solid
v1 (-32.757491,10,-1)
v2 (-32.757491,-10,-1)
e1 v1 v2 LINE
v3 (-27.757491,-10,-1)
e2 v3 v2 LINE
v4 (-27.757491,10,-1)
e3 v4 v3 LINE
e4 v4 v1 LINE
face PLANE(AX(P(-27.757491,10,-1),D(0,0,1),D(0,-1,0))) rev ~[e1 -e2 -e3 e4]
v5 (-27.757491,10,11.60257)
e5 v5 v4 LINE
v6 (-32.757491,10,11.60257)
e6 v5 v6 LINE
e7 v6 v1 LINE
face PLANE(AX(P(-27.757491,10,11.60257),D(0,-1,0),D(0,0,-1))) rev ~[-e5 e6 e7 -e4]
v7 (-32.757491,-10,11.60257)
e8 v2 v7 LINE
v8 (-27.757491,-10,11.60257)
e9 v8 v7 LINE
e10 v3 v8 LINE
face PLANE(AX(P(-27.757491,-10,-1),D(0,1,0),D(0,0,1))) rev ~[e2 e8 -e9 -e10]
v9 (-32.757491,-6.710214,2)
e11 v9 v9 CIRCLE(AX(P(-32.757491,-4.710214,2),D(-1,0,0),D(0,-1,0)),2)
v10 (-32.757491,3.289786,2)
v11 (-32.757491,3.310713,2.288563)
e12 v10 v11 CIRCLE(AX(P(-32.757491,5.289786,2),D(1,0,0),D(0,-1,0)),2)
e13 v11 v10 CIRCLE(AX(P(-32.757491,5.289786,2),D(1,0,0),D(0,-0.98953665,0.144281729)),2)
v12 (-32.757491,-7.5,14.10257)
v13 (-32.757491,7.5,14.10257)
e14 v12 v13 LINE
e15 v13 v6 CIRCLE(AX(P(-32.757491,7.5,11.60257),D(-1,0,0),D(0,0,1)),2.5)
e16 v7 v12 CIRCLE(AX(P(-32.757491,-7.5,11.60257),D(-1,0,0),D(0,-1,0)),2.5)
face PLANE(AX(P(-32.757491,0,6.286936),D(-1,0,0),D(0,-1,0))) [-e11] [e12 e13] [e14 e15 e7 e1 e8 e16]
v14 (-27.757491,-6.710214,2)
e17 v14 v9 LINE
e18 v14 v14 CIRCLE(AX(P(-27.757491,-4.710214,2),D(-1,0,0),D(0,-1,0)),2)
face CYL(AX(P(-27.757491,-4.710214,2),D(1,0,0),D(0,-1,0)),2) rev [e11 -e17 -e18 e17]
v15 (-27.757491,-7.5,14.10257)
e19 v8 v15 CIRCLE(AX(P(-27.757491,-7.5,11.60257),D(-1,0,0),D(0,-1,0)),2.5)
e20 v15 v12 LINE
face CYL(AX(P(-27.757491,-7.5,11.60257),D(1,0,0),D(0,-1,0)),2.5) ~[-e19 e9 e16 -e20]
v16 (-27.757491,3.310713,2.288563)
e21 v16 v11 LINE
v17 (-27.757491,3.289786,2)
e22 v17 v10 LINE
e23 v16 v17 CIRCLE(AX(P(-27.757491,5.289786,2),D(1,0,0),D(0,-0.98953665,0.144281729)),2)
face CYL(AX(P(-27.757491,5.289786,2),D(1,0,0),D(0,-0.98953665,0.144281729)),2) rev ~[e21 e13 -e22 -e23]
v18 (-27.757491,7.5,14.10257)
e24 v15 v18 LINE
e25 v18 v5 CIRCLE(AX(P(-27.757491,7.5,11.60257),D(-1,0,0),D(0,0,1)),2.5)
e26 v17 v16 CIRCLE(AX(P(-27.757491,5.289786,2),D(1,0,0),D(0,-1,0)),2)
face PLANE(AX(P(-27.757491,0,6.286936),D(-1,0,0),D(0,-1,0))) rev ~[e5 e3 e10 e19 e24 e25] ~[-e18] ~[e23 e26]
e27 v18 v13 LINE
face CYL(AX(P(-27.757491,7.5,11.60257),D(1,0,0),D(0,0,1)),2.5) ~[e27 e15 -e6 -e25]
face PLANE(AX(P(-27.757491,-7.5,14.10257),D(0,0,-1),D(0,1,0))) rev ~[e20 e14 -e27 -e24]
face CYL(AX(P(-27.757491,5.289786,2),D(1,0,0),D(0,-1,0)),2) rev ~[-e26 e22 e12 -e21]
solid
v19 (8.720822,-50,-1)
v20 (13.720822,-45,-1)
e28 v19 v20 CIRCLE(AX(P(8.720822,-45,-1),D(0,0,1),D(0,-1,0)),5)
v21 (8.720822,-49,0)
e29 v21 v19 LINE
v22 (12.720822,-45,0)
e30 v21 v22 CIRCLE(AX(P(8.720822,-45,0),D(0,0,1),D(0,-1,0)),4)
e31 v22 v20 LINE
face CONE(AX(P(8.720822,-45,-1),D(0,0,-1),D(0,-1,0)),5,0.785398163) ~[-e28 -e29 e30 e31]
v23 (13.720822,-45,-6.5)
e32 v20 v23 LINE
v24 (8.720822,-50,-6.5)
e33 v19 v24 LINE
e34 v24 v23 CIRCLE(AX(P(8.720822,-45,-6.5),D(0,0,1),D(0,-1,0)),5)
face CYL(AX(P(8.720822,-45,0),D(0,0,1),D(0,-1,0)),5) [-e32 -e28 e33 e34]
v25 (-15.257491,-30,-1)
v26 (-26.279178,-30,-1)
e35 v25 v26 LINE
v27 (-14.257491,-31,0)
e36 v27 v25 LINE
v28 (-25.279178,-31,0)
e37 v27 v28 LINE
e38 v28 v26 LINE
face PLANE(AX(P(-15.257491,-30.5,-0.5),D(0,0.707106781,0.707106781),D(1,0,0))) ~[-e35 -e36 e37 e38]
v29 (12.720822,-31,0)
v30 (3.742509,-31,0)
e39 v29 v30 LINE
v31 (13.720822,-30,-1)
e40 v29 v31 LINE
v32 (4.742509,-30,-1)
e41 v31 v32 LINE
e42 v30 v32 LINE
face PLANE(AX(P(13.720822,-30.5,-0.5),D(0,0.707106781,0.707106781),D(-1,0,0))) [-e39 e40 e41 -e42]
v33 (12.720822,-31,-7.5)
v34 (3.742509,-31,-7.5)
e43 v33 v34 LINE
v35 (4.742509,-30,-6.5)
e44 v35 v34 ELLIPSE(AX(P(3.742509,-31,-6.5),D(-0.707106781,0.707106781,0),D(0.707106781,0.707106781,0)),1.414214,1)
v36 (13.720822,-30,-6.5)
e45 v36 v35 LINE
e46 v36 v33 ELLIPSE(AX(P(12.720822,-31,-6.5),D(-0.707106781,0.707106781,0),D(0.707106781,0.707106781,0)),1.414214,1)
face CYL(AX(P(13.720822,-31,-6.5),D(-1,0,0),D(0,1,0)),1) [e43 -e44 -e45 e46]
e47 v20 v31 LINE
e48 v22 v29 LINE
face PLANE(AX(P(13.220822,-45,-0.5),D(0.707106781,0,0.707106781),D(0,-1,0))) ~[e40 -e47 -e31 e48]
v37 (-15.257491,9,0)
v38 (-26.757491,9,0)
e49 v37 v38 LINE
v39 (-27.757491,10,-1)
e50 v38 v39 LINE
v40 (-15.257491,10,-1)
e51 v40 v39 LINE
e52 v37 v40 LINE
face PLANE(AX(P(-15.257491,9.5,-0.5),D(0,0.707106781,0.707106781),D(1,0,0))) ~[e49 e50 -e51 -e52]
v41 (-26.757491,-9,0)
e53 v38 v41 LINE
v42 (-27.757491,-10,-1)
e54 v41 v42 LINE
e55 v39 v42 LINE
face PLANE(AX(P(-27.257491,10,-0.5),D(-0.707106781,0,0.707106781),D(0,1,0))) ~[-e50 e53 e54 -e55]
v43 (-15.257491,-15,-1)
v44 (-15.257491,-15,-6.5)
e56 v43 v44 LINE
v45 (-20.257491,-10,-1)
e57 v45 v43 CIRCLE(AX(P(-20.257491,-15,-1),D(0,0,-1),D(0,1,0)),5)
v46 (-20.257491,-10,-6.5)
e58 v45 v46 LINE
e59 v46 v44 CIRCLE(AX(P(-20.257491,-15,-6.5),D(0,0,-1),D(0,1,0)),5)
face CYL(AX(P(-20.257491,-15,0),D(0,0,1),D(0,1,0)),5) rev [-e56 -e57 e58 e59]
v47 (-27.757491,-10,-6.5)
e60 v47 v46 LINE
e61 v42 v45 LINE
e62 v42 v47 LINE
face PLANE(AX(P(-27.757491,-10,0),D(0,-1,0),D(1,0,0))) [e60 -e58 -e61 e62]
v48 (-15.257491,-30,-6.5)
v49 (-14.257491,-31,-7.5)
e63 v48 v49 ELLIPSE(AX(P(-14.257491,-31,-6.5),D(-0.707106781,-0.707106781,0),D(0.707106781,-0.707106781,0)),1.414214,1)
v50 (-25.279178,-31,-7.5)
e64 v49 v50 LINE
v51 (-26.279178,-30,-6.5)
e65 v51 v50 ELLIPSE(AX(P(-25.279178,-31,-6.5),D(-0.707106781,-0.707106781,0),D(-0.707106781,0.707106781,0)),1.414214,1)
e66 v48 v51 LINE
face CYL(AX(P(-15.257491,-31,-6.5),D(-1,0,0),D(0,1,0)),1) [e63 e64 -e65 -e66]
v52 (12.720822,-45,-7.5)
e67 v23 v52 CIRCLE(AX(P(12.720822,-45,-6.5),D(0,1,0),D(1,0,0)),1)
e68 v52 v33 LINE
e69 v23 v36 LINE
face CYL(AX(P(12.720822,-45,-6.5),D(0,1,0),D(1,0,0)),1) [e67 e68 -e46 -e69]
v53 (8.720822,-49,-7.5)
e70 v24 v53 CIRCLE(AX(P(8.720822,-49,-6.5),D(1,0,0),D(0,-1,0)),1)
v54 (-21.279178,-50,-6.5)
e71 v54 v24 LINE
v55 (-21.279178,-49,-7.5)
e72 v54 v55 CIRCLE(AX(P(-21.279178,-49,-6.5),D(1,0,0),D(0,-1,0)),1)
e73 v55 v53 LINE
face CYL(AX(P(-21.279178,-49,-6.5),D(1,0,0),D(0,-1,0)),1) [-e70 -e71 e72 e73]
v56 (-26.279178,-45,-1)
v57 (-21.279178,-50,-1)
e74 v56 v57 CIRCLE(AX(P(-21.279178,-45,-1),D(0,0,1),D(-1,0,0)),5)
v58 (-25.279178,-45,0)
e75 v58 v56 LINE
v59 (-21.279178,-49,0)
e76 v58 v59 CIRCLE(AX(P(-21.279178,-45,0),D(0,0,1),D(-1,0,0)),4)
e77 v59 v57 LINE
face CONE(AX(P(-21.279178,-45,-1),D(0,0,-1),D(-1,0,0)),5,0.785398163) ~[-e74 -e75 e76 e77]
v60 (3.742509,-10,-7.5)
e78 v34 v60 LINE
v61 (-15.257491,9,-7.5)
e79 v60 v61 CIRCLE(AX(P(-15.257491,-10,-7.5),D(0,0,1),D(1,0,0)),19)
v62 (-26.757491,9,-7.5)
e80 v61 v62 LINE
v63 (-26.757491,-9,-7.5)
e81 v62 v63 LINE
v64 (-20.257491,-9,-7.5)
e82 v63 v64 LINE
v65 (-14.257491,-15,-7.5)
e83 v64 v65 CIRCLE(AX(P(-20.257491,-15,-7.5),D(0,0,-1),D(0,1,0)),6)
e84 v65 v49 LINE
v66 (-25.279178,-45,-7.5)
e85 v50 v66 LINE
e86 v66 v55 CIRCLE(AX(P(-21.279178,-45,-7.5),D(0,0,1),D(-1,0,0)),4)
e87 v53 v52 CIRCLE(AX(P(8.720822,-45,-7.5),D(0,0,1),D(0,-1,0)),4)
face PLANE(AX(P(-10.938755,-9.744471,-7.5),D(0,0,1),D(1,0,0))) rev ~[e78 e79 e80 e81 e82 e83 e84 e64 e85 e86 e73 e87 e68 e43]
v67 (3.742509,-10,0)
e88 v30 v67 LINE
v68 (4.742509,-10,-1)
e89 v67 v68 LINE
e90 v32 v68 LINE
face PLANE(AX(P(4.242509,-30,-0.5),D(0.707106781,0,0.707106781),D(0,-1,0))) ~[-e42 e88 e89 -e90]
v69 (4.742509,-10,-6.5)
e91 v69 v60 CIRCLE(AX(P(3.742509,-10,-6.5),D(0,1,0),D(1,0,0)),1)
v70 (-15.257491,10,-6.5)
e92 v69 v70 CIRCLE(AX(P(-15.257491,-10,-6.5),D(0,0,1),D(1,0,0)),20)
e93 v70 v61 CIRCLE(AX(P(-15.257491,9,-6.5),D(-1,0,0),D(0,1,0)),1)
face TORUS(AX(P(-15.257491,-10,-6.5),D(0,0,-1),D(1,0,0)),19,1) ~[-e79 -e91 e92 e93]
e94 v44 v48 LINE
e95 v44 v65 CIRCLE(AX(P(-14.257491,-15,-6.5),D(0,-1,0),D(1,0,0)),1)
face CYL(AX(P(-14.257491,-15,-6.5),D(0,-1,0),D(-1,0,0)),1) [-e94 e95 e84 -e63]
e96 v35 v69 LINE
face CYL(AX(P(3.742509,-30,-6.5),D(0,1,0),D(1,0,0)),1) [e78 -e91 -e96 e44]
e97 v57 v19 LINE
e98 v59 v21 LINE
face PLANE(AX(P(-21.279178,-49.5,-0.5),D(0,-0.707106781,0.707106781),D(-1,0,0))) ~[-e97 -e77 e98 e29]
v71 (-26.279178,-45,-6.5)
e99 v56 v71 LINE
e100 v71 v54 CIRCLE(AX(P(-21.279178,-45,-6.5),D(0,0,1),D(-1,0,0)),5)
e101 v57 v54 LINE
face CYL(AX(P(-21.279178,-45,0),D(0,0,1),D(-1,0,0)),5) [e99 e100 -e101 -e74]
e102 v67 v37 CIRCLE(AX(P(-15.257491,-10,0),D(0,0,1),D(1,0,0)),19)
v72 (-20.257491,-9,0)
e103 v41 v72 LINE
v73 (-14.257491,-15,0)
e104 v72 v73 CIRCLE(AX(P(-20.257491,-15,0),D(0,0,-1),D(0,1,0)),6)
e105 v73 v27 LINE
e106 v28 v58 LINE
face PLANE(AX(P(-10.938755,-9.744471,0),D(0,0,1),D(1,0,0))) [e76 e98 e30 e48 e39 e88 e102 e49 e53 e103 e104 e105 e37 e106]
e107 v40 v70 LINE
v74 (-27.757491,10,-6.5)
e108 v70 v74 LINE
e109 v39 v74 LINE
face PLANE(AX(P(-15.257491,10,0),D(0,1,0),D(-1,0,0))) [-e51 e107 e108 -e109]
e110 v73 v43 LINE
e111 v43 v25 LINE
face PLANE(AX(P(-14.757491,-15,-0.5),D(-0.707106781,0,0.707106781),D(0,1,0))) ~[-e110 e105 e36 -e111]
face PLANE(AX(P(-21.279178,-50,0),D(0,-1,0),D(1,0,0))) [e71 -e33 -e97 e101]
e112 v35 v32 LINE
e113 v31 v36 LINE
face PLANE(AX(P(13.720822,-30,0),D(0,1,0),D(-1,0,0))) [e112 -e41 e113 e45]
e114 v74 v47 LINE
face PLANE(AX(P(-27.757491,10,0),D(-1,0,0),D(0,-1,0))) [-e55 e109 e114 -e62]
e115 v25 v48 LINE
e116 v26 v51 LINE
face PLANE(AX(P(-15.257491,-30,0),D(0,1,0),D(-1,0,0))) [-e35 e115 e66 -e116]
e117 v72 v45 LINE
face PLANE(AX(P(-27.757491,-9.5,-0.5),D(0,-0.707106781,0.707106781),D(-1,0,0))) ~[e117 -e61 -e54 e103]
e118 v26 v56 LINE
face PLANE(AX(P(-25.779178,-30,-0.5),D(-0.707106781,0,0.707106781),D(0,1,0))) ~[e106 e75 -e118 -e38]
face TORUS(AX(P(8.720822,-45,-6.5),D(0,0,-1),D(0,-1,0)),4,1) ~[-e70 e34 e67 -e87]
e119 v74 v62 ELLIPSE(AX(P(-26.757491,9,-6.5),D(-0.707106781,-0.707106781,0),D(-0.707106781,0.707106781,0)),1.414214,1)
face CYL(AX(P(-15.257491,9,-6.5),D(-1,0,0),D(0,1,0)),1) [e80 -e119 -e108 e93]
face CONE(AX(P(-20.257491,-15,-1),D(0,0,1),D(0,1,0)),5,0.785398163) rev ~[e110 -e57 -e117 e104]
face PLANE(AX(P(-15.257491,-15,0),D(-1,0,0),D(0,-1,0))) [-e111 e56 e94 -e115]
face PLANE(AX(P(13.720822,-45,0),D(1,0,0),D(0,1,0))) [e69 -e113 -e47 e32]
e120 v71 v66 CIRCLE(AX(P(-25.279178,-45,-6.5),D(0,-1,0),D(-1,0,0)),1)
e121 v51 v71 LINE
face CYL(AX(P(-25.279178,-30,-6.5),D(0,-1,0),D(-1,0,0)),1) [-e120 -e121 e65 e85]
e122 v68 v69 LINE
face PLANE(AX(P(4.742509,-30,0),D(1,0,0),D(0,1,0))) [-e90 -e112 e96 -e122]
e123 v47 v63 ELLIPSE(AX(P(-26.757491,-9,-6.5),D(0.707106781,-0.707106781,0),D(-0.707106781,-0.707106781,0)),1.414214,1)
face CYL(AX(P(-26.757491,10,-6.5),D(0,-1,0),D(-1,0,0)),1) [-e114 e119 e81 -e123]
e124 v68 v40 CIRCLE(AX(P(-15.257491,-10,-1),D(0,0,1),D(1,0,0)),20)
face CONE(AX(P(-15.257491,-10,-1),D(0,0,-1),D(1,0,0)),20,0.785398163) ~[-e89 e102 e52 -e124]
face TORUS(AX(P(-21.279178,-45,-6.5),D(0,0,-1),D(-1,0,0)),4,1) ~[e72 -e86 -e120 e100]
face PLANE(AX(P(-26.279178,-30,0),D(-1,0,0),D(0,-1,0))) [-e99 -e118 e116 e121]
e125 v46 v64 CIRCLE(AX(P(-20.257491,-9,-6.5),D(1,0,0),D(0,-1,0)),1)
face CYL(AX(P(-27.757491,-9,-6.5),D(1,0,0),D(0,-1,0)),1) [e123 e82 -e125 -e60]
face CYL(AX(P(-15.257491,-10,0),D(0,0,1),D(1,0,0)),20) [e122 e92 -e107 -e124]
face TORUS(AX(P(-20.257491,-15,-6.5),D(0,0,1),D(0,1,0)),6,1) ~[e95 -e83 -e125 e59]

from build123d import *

# Parameters (mm, degrees)
F1_DEPTH = 7.5
F2_DEPTH = 2.5
F3_R     = 1
F4_SIZE  = 1
F5_R     = 2
F6_DEPTH = 5


# Not quite as in the source:
# - a feature names something its author has since deleted; it is built from what else it names


with BuildPart() as f1:
    # F0 (on Top) → F1 (new body)
    with BuildSketch(Plane.XY):
        with BuildLine():
            Line((-15.2574911714, 10), (-27.7574911714, 10))
            Line((-27.7574911714, 10), (-27.7574911714, -10))
            Line((-27.7574911714, -10), (-20.2574911714, -10))
            ThreePointArc((-20.2574911714, -10), (-16.7219572654, -11.4644660941), (-15.2574911714, -15))
            Line((-15.2574911714, -15), (-15.2574911714, -30.0000000031))
            Line((-15.2574911714, -30.0000000031), (4.7425088286, -30.0000000031))
            Line((4.7425088286, -30.0000000031), (4.7425088286, -10))
            ThreePointArc((4.7425088286, -10), (-1.1153555476, 4.1421356237), (-15.2574911714, 10))
        make_face()
        with BuildLine():
            Line((13.7208224833, -30.0000000031), (4.7425088286, -30.0000000031))
            Line((4.7425088286, -30.0000000031), (-15.2574911714, -30.0000000031))
            Line((-15.2574911714, -30.0000000031), (-26.2791775167, -30.0000000031))
            Line((-26.2791775167, -30.0000000031), (-26.2791775167, -45.0000000031))
            ThreePointArc((-26.2791775167, -45.0000000031), (-24.8147114226, -48.535533909), (-21.2791775167, -50.0000000031))
            Line((-21.2791775167, -50.0000000031), (8.7208224833, -50.0000000031))
            ThreePointArc((8.7208224833, -50.0000000031), (12.2563563892, -48.535533909), (13.7208224833, -45.0000000031))
            Line((13.7208224833, -45.0000000031), (13.7208224833, -30.0000000031))
        make_face()
    extrude(amount=-F1_DEPTH)

    # F0 (on Top) → F2 (join)
    with BuildSketch(Plane.XY):
        with BuildLine():
            Line((13.7208224833, -30.0000000031), (4.7425088286, -30.0000000031))
            Line((4.7425088286, -30.0000000031), (-15.2574911714, -30.0000000031))
            Line((-15.2574911714, -30.0000000031), (-26.2791775167, -30.0000000031))
            Line((-26.2791775167, -30.0000000031), (-26.2791775167, -45.0000000031))
            ThreePointArc((-26.2791775167, -45.0000000031), (-24.8147114226, -48.535533909), (-21.2791775167, -50.0000000031))
            Line((-21.2791775167, -50.0000000031), (8.7208224833, -50.0000000031))
            ThreePointArc((8.7208224833, -50.0000000031), (12.2563563892, -48.535533909), (13.7208224833, -45.0000000031))
            Line((13.7208224833, -45.0000000031), (13.7208224833, -30.0000000031))
        make_face()
    extrude(amount=-F2_DEPTH)

    # F3
    f3_edges = [f1.edges().sort_by_distance(p)[0] for p in [
        (-21.507491, 10, -7.5),
        (-27.757491, 0, -7.5),
        (-24.007491, -10, -7.5),
        (-16.721957, -11.464466, -7.5),
        (-15.257491, -22.5, -7.5),
        (-20.768334, -30, -7.5),
        (-26.279178, -37.5, -7.5),
        (-24.814711, -48.535534, -7.5),
        (-6.279178, -50, -7.5),
        (12.256356, -48.535534, -7.5),
        (13.720822, -37.5, -7.5),
        (9.231666, -30, -7.5),
        (4.742509, -20, -7.5),
        (-1.115356, 4.142136, -7.5),
    ]]
    fillet(f3_edges, radius=F3_R)

    # F4
    f4_edges = [f1.edges().sort_by_distance(p)[0] for p in [
        (-1.115356, 4.142136, 0),
        (-21.507491, 10, 0),
        (-27.757491, 0, 0),
        (-24.007491, -10, 0),
        (-16.721957, -11.464466, 0),
        (-15.257491, -22.5, 0),
        (-20.768334, -30, 0),
        (-26.279178, -37.5, 0),
        (-24.814711, -48.535534, 0),
        (-6.279178, -50, 0),
        (12.256356, -48.535534, 0),
        (13.720822, -37.5, 0),
        (9.231666, -30, 0),
        (4.742509, -20, 0),
    ]]
    chamfer(f4_edges, length=F4_SIZE)


with BuildPart() as f6:
    # F5 (on face) → F6 (new body)
    with BuildSketch(Plane(origin=(-27.7574911714, 0, 0), x_dir=(0, -1, 0), z_dir=(-1, 0, 0))):
        with BuildLine():
            Line((-10, 11.602570191), (-10, -1))
            Line((-10, -1), (10, -1))
            Line((10, -1), (10, 11.602570191))
            ThreePointArc((10, 11.602570191), (9.267766953, 13.370337144), (7.5, 14.102570191))
            Line((7.5, 14.102570191), (-7.5, 14.102570191))
            ThreePointArc((-7.5, 14.102570191), (-9.267766953, 13.370337144), (-10, 11.602570191))
        make_face()
        with BuildLine():
            ThreePointArc((-3.2897860792, 2), (-7.2845475439, 1.8553393662), (-3.3107127782, 2.2885634578))
            ThreePointArc((-3.3107127782, 2.2885634578), (-3.2950246145, 2.1446606338), (-3.2897860792, 2))
        make_face(mode=Mode.SUBTRACT)
        with Locations((4.7102139208, 2)):
            Circle(F5_R, mode=Mode.SUBTRACT)
    extrude(amount=F6_DEPTH)


solid = Compound([f1.part, f6.part])
